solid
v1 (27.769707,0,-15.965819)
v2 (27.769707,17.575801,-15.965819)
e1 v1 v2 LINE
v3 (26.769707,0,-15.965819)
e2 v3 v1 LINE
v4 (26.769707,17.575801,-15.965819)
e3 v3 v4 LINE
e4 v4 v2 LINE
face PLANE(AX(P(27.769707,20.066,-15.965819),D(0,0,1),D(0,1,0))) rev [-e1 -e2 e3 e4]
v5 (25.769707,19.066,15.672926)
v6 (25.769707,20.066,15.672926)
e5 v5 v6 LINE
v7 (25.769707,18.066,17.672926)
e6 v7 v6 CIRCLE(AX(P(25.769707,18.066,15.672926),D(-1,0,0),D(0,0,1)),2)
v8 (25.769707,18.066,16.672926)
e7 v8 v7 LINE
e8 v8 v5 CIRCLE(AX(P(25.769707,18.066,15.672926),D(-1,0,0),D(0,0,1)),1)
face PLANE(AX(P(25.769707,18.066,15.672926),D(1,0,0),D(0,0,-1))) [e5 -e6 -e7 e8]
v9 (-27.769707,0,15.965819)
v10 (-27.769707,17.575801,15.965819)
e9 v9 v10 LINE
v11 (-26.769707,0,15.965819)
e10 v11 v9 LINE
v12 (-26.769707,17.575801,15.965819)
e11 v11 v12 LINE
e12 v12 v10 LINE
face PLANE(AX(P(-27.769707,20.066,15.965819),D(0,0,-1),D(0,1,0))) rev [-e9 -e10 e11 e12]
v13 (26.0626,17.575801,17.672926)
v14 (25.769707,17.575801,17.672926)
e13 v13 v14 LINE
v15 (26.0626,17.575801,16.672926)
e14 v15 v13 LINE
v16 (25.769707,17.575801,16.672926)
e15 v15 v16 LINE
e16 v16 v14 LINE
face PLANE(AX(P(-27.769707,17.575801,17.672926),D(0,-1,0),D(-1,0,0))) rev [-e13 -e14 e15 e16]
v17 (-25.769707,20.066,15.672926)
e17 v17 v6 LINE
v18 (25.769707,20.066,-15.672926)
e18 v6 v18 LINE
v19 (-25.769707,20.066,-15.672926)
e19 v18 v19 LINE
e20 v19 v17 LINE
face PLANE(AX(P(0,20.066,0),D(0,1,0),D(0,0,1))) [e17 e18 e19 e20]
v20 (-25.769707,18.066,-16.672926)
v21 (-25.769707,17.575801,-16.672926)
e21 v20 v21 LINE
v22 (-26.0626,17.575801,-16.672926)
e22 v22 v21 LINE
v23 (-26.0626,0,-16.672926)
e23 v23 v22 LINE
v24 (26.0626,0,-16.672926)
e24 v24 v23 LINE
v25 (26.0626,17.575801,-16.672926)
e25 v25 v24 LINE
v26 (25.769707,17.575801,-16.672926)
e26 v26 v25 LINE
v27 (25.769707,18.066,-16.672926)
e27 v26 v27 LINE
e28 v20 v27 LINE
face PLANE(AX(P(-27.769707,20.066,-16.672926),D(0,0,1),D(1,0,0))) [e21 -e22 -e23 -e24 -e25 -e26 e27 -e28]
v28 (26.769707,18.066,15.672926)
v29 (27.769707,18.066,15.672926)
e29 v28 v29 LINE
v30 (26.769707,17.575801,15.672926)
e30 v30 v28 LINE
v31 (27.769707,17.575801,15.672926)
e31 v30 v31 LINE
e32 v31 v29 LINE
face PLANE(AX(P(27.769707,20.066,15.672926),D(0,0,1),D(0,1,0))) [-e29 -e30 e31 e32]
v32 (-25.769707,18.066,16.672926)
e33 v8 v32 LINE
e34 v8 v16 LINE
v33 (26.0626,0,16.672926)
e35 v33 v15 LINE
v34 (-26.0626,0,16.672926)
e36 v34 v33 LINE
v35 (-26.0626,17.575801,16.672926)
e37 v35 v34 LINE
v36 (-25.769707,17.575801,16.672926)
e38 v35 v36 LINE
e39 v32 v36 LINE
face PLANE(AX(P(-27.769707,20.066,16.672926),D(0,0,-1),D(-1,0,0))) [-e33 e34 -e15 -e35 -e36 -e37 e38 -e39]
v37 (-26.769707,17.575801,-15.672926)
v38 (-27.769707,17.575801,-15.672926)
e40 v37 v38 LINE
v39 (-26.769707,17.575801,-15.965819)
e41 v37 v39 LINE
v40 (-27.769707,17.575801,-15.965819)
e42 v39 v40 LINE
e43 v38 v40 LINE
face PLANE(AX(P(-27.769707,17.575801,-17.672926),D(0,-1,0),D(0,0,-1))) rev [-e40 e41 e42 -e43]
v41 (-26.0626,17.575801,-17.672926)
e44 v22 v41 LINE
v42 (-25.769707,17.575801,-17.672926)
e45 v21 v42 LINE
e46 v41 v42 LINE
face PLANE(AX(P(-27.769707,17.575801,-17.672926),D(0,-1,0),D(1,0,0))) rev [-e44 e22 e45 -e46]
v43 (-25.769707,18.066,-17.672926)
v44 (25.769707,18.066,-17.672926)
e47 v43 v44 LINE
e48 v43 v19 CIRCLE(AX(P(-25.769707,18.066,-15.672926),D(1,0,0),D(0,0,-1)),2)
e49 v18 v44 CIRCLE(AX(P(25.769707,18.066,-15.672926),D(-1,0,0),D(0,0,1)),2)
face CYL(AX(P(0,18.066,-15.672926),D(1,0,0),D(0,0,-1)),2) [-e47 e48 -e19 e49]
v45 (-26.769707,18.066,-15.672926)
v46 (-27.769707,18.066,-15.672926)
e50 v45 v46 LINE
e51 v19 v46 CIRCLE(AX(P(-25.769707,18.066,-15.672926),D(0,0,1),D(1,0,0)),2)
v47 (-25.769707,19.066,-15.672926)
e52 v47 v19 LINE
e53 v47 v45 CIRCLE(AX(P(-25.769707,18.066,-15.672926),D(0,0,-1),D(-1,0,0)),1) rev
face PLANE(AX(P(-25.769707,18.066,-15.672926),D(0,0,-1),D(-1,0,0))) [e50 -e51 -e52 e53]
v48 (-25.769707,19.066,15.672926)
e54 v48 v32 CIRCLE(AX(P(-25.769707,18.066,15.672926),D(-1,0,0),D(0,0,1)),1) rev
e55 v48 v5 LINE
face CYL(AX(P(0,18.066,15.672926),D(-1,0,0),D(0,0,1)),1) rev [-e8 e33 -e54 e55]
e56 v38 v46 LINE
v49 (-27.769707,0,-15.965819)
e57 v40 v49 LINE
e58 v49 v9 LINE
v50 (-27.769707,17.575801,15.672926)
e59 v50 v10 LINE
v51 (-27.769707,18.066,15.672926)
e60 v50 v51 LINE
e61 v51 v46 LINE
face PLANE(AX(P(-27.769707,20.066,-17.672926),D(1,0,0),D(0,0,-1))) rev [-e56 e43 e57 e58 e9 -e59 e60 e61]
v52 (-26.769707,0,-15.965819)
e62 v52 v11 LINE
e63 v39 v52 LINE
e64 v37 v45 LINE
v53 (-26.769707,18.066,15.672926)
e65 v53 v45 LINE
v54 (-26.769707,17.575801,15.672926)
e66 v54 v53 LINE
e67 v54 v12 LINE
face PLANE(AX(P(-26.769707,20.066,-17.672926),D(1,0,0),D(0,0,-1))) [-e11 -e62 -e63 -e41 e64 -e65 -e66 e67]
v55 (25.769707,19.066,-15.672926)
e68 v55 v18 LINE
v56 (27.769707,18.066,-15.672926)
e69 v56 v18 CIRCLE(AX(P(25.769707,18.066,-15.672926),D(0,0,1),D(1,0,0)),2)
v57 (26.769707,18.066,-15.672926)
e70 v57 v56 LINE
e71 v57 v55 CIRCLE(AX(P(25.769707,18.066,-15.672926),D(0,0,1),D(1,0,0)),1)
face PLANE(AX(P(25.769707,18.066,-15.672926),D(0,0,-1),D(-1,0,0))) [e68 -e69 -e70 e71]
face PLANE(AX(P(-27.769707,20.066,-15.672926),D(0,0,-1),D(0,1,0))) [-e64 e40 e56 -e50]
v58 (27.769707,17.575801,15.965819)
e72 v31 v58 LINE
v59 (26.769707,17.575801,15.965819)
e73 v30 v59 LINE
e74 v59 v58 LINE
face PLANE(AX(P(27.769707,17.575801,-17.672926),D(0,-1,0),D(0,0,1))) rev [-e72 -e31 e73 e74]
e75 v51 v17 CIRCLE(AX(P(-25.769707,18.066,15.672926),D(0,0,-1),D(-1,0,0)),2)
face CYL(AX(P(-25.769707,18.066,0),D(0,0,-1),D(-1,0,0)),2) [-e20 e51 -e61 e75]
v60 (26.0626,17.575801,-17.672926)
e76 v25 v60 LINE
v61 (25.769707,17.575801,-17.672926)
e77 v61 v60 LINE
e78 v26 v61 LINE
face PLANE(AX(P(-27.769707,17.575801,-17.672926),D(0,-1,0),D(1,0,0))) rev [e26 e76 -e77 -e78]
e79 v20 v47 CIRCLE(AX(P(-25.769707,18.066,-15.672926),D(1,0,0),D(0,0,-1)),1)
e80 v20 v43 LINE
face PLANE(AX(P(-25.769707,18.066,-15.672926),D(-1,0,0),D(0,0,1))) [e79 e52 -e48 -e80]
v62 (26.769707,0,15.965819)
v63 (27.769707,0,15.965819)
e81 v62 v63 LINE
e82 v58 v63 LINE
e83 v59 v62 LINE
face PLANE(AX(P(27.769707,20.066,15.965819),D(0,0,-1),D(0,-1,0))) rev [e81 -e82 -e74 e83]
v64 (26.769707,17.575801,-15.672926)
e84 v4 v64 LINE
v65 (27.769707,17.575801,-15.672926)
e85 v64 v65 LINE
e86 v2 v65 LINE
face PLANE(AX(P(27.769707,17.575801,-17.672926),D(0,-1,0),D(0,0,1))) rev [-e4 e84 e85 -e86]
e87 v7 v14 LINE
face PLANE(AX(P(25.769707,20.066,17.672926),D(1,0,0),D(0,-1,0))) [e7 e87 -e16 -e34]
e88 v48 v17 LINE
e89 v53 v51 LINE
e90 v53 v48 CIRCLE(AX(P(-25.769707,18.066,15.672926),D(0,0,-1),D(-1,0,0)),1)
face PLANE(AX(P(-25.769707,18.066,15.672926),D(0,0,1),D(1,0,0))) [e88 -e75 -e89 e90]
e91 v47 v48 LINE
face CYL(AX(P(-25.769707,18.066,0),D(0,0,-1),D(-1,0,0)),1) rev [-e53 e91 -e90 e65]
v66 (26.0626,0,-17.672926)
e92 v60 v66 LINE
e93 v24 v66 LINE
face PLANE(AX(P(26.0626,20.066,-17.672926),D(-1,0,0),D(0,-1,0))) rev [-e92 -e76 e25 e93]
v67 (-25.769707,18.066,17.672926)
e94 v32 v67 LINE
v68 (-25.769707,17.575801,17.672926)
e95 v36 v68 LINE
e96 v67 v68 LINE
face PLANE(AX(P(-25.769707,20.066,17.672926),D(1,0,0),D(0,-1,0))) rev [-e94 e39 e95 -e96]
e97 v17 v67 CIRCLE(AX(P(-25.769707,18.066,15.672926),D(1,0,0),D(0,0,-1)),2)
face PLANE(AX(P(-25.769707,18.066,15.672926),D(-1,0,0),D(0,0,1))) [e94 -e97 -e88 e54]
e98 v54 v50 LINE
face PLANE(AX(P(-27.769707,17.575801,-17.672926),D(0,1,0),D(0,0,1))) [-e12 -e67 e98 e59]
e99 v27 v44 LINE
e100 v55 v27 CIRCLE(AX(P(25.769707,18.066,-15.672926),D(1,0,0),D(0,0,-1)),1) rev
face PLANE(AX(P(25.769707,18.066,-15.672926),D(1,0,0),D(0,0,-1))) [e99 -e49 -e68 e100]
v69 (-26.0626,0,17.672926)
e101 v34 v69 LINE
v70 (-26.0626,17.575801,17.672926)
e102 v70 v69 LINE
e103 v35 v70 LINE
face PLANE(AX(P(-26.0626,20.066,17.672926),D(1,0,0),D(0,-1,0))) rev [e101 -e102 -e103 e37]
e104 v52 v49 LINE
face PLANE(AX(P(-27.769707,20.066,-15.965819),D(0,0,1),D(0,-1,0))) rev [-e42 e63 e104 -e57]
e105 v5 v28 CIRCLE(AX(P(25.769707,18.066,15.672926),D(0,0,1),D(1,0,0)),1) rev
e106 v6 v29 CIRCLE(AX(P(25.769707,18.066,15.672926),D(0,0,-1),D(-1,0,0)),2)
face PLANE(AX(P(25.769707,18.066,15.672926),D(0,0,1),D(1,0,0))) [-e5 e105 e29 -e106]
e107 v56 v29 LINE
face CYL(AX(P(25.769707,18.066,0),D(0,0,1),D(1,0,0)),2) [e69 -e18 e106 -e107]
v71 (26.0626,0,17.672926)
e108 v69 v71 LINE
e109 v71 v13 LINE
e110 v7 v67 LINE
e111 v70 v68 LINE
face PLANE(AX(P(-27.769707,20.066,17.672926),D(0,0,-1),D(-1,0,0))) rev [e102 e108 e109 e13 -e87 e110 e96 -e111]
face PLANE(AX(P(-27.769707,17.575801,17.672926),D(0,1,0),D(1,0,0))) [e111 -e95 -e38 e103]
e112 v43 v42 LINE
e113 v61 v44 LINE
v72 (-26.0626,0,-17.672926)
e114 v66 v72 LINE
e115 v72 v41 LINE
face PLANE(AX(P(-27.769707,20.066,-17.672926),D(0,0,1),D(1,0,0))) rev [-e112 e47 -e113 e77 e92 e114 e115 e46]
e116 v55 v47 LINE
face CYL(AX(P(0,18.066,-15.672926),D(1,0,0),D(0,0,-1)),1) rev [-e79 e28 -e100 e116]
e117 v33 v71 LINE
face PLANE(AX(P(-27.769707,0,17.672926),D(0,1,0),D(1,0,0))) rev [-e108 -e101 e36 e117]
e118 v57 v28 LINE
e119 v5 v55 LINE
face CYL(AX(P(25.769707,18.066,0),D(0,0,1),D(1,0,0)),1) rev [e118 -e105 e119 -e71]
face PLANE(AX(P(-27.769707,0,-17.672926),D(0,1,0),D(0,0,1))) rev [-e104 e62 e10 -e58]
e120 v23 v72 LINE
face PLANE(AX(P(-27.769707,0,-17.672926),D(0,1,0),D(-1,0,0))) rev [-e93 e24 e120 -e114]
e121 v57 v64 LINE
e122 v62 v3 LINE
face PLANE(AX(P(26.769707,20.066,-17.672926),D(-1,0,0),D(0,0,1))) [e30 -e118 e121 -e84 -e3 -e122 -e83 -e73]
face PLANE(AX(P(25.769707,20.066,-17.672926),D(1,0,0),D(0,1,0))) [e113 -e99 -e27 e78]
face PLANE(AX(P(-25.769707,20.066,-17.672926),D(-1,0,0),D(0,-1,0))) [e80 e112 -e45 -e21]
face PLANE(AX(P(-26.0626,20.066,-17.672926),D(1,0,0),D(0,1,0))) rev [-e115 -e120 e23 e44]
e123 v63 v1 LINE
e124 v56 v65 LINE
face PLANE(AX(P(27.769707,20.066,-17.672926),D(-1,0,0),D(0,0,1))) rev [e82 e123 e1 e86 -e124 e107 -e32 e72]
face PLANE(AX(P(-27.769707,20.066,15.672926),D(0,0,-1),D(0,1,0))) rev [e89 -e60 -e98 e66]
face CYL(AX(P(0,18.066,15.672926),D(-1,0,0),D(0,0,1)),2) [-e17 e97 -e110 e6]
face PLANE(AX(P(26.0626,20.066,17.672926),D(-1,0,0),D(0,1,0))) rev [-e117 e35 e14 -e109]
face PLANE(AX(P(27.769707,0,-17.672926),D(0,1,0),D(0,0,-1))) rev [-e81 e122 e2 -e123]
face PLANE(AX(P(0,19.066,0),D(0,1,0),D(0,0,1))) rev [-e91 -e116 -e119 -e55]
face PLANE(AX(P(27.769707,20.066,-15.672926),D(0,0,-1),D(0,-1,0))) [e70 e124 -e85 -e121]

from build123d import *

# Parameters (mm, degrees)
SKETCH2_W                = 55.53941402
SKETCH2_H                = 35.345852224
BOSS_EXTRUDE1_DEPTH      = 20.066
CONVERT_SOLID10_START    = -25.769706946
CONVERT_SOLID10_DEPTH    = 51.539413892
CONVERT_SOLID10_START_2  = -29
CONVERT_SOLID10_2_DEPTH  = 58
CONVERT_SOLID10_3_DEPTH  = 58
CONVERT_SOLID10_4_DEPTH  = 2.937399826
CONVERT_SOLID10_START_3  = 26.062600174
CONVERT_SOLID10_5_DEPTH  = 2.937399826
CONVERT_SOLID10_START_4  = -26.062600174
CONVERT_SOLID10_6_DEPTH  = 0.292893228
CONVERT_SOLID10_START_5  = 25.769706946
CONVERT_SOLID10_7_DEPTH  = 0.292893228
CONVERT_SOLID10_START_6  = -15.965819276
CONVERT_SOLID10_8_DEPTH  = 31.931638552
CONVERT_SOLID10_9_DEPTH  = 0.292893228
CONVERT_SOLID10_START_7  = 15.672926048
CONVERT_SOLID10_10_DEPTH = 0.292893228


with BuildPart() as part:
    # Sketch2 → Boss-Extrude1 (new body)
    with BuildSketch(Plane(origin=(0, 0, 0), x_dir=(1, 0, 0), z_dir=(0, 1, 0))):
        Rectangle(SKETCH2_W, SKETCH2_H)
    extrude(amount=BOSS_EXTRUDE1_DEPTH)

    # Convert-Solid10: read off the stored shape, not the designer's step
    # Convert-Solid10 outline → Convert-Solid10 (cut)
    with BuildSketch(Plane.YZ.offset(CONVERT_SOLID10_START)):
        with BuildLine():
            Line((0, 16.67292608), (0, -16.67292608))
            Line((0, -16.67292608), (18.065999936, -16.67292608))
            ThreePointArc((18.065999936, -16.67292608), (18.77310674, -16.380032852), (19.065999968, -15.672926048))
            Line((19.065999968, -15.672926048), (19.065999968, 15.672926048))
            ThreePointArc((19.065999968, 15.672926048), (18.77310674, 16.380032852), (18.065999936, 16.67292608))
            Line((18.065999936, 16.67292608), (0, 16.67292608))
        make_face()
    extrude(amount=CONVERT_SOLID10_DEPTH, mode=Mode.SUBTRACT)

    # Convert-Solid10 2 outline → Convert-Solid10 2 (cut)
    with BuildSketch(Plane.YZ.offset(CONVERT_SOLID10_START_2)):
        with BuildLine():
            Line((0, 15.965819276), (17.57580092, 15.965819276))
            Line((17.57580092, 15.965819276), (17.57580092, 15.672926048))
            Line((17.57580092, 15.672926048), (19.065999968, 15.672926048))
            ThreePointArc((19.065999968, 15.672926048), (18.77310674, 16.380032852), (18.065999936, 16.67292608))
            Line((18.065999936, 16.67292608), (0, 16.67292608))
            Line((0, 16.67292608), (0, 15.965819276))
        make_face()
        with BuildLine():
            Line((17.57580092, -15.965819276), (0, -15.965819276))
            Line((0, -15.965819276), (0, -16.67292608))
            Line((0, -16.67292608), (18.065999936, -16.67292608))
            ThreePointArc((18.065999936, -16.67292608), (18.77310674, -16.380032852), (19.065999968, -15.672926048))
            Line((19.065999968, -15.672926048), (17.57580092, -15.672926048))
            Line((17.57580092, -15.672926048), (17.57580092, -15.965819276))
        make_face()
    extrude(amount=CONVERT_SOLID10_2_DEPTH, mode=Mode.SUBTRACT)

    # Convert-Solid10 3 outline → Convert-Solid10 3 (cut)
    with BuildSketch(Plane.YZ.offset(CONVERT_SOLID10_START_2)):
        with BuildLine():
            Line((20.066, 17.672926112), (18.065999936, 17.672926112))
            ThreePointArc((18.065999936, 17.672926112), (19.480213544, 17.087139656), (20.066, 15.672926048))
            Line((20.066, 15.672926048), (20.066, 17.672926112))
        make_face()
        with BuildLine():
            Line((20.066, -17.672926112), (20.066, -15.672926048))
            ThreePointArc((20.066, -15.672926048), (19.480213544, -17.087139656), (18.065999936, -17.672926112))
            Line((18.065999936, -17.672926112), (20.066, -17.672926112))
        make_face()
    extrude(amount=CONVERT_SOLID10_3_DEPTH, mode=Mode.SUBTRACT)

    # Convert-Solid10 4 outline → Convert-Solid10 4 (cut)
    with BuildSketch(Plane.YZ.offset(CONVERT_SOLID10_START_2)):
        with BuildLine():
            Line((0, 16.67292608), (18.065999936, 16.67292608))
            ThreePointArc((18.065999936, 16.67292608), (18.77310674, 16.380032852), (19.065999968, 15.672926048))
            Line((19.065999968, 15.672926048), (20.066, 15.672926048))
            ThreePointArc((20.066, 15.672926048), (19.480213544, 17.087139656), (18.065999936, 17.672926112))
            Line((18.065999936, 17.672926112), (0, 17.672926112))
            Line((0, 17.672926112), (0, 16.67292608))
        make_face()
        with BuildLine():
            ThreePointArc((18.065999936, -17.672926112), (19.480213544, -17.087139656), (20.066, -15.672926048))
            Line((20.066, -15.672926048), (19.065999968, -15.672926048))
            ThreePointArc((19.065999968, -15.672926048), (18.77310674, -16.380032852), (18.065999936, -16.67292608))
            Line((18.065999936, -16.67292608), (0, -16.67292608))
            Line((0, -16.67292608), (0, -17.672926112))
            Line((0, -17.672926112), (18.065999936, -17.672926112))
        make_face()
    extrude(amount=CONVERT_SOLID10_4_DEPTH, mode=Mode.SUBTRACT)

    # Convert-Solid10 5 outline → Convert-Solid10 5 (cut)
    with BuildSketch(Plane.YZ.offset(CONVERT_SOLID10_START_3)):
        with BuildLine():
            Line((0, 16.67292608), (18.065999936, 16.67292608))
            ThreePointArc((18.065999936, 16.67292608), (18.77310674, 16.380032852), (19.065999968, 15.672926048))
            Line((19.065999968, 15.672926048), (20.066, 15.672926048))
            ThreePointArc((20.066, 15.672926048), (19.480213544, 17.087139656), (18.065999936, 17.672926112))
            Line((18.065999936, 17.672926112), (0, 17.672926112))
            Line((0, 17.672926112), (0, 16.67292608))
        make_face()
        with BuildLine():
            ThreePointArc((18.065999936, -17.672926112), (19.480213544, -17.087139656), (20.066, -15.672926048))
            Line((20.066, -15.672926048), (19.065999968, -15.672926048))
            ThreePointArc((19.065999968, -15.672926048), (18.77310674, -16.380032852), (18.065999936, -16.67292608))
            Line((18.065999936, -16.67292608), (0, -16.67292608))
            Line((0, -16.67292608), (0, -17.672926112))
            Line((0, -17.672926112), (18.065999936, -17.672926112))
        make_face()
    extrude(amount=CONVERT_SOLID10_5_DEPTH, mode=Mode.SUBTRACT)

    # Convert-Solid10 6 outline → Convert-Solid10 6 (cut)
    with BuildSketch(Plane.YZ.offset(CONVERT_SOLID10_START_4)):
        with BuildLine():
            Line((17.57580092, 17.672926112), (17.57580092, 16.67292608))
            Line((17.57580092, 16.67292608), (18.065999936, 16.67292608))
            ThreePointArc((18.065999936, 16.67292608), (18.77310674, 16.380032852), (19.065999968, 15.672926048))
            Line((19.065999968, 15.672926048), (20.066, 15.672926048))
            ThreePointArc((20.066, 15.672926048), (19.480213544, 17.087139656), (18.065999936, 17.672926112))
            Line((18.065999936, 17.672926112), (17.57580092, 17.672926112))
        make_face()
        with BuildLine():
            ThreePointArc((18.065999936, -17.672926112), (19.480213544, -17.087139656), (20.066, -15.672926048))
            Line((20.066, -15.672926048), (19.065999968, -15.672926048))
            ThreePointArc((19.065999968, -15.672926048), (18.77310674, -16.380032852), (18.065999936, -16.67292608))
            Line((18.065999936, -16.67292608), (17.57580092, -16.67292608))
            Line((17.57580092, -16.67292608), (17.57580092, -17.672926112))
            Line((17.57580092, -17.672926112), (18.065999936, -17.672926112))
        make_face()
    extrude(amount=CONVERT_SOLID10_6_DEPTH, mode=Mode.SUBTRACT)

    # Convert-Solid10 7 outline → Convert-Solid10 7 (cut)
    with BuildSketch(Plane.YZ.offset(CONVERT_SOLID10_START_5)):
        with BuildLine():
            Line((17.57580092, 17.672926112), (17.57580092, 16.67292608))
            Line((17.57580092, 16.67292608), (18.065999936, 16.67292608))
            ThreePointArc((18.065999936, 16.67292608), (18.77310674, 16.380032852), (19.065999968, 15.672926048))
            Line((19.065999968, 15.672926048), (20.066, 15.672926048))
            ThreePointArc((20.066, 15.672926048), (19.480213544, 17.087139656), (18.065999936, 17.672926112))
            Line((18.065999936, 17.672926112), (17.57580092, 17.672926112))
        make_face()
        with BuildLine():
            ThreePointArc((18.065999936, -17.672926112), (19.480213544, -17.087139656), (20.066, -15.672926048))
            Line((20.066, -15.672926048), (19.065999968, -15.672926048))
            ThreePointArc((19.065999968, -15.672926048), (18.77310674, -16.380032852), (18.065999936, -16.67292608))
            Line((18.065999936, -16.67292608), (17.57580092, -16.67292608))
            Line((17.57580092, -16.67292608), (17.57580092, -17.672926112))
            Line((17.57580092, -17.672926112), (18.065999936, -17.672926112))
        make_face()
    extrude(amount=CONVERT_SOLID10_7_DEPTH, mode=Mode.SUBTRACT)

    # Convert-Solid10 8 outline → Convert-Solid10 8 (cut)
    with BuildSketch(Plane.XY.offset(CONVERT_SOLID10_START_6)):
        with BuildLine():
            Line((-27.76970701, 20.066), (-27.76970701, 18.065999936))
            ThreePointArc((-27.76970701, 18.065999936), (-27.183920554, 19.480213544), (-25.769706946, 20.066))
            Line((-25.769706946, 20.066), (-27.76970701, 20.066))
        make_face()
        with BuildLine():
            Line((27.76970701, 20.066), (25.769706946, 20.066))
            ThreePointArc((25.769706946, 20.066), (27.183920554, 19.480213544), (27.76970701, 18.065999936))
            Line((27.76970701, 18.065999936), (27.76970701, 20.066))
        make_face()
        with BuildLine():
            ThreePointArc((-25.769706946, 19.065999968), (-26.47681375, 18.77310674), (-26.769706978, 18.065999936))
            Line((-26.769706978, 18.065999936), (-26.769706978, 0))
            Line((-26.769706978, 0), (-25.769706946, 0))
            Line((-25.769706946, 0), (-25.769706946, 19.065999968))
        make_face()
        with BuildLine():
            ThreePointArc((26.769706978, 18.065999936), (26.47681375, 18.77310674), (25.769706946, 19.065999968))
            Line((25.769706946, 19.065999968), (25.769706946, 0))
            Line((25.769706946, 0), (26.769706978, 0))
            Line((26.769706978, 0), (26.769706978, 18.065999936))
        make_face()
    extrude(amount=CONVERT_SOLID10_8_DEPTH, mode=Mode.SUBTRACT)

    # Convert-Solid10 9 outline → Convert-Solid10 9 (cut)
    with BuildSketch(Plane.XY.offset(CONVERT_SOLID10_START_6)):
        with BuildLine():
            ThreePointArc((-25.769706946, 20.066), (-27.183920554, 19.480213544), (-27.76970701, 18.065999936))
            Line((-27.76970701, 18.065999936), (-27.76970701, 17.57580092))
            Line((-27.76970701, 17.57580092), (-26.769706978, 17.57580092))
            Line((-26.769706978, 17.57580092), (-26.769706978, 18.065999936))
            ThreePointArc((-26.769706978, 18.065999936), (-26.47681375, 18.77310674), (-25.769706946, 19.065999968))
            Line((-25.769706946, 19.065999968), (-25.769706946, 20.066))
        make_face()
        with BuildLine():
            ThreePointArc((27.76970701, 18.065999936), (27.183920554, 19.480213544), (25.769706946, 20.066))
            Line((25.769706946, 20.066), (25.769706946, 19.065999968))
            ThreePointArc((25.769706946, 19.065999968), (26.47681375, 18.77310674), (26.769706978, 18.065999936))
            Line((26.769706978, 18.065999936), (26.769706978, 17.57580092))
            Line((26.769706978, 17.57580092), (27.76970701, 17.57580092))
            Line((27.76970701, 17.57580092), (27.76970701, 18.065999936))
        make_face()
    extrude(amount=CONVERT_SOLID10_9_DEPTH, mode=Mode.SUBTRACT)

    # Convert-Solid10 10 outline → Convert-Solid10 10 (cut)
    with BuildSketch(Plane.XY.offset(CONVERT_SOLID10_START_7)):
        with BuildLine():
            ThreePointArc((-25.769706946, 20.066), (-27.183920554, 19.480213544), (-27.76970701, 18.065999936))
            Line((-27.76970701, 18.065999936), (-27.76970701, 17.57580092))
            Line((-27.76970701, 17.57580092), (-26.769706978, 17.57580092))
            Line((-26.769706978, 17.57580092), (-26.769706978, 18.065999936))
            ThreePointArc((-26.769706978, 18.065999936), (-26.47681375, 18.77310674), (-25.769706946, 19.065999968))
            Line((-25.769706946, 19.065999968), (-25.769706946, 20.066))
        make_face()
        with BuildLine():
            ThreePointArc((27.76970701, 18.065999936), (27.183920554, 19.480213544), (25.769706946, 20.066))
            Line((25.769706946, 20.066), (25.769706946, 19.065999968))
            ThreePointArc((25.769706946, 19.065999968), (26.47681375, 18.77310674), (26.769706978, 18.065999936))
            Line((26.769706978, 18.065999936), (26.769706978, 17.57580092))
            Line((26.769706978, 17.57580092), (27.76970701, 17.57580092))
            Line((27.76970701, 17.57580092), (27.76970701, 18.065999936))
        make_face()
    extrude(amount=CONVERT_SOLID10_10_DEPTH, mode=Mode.SUBTRACT)


solid = part.part
